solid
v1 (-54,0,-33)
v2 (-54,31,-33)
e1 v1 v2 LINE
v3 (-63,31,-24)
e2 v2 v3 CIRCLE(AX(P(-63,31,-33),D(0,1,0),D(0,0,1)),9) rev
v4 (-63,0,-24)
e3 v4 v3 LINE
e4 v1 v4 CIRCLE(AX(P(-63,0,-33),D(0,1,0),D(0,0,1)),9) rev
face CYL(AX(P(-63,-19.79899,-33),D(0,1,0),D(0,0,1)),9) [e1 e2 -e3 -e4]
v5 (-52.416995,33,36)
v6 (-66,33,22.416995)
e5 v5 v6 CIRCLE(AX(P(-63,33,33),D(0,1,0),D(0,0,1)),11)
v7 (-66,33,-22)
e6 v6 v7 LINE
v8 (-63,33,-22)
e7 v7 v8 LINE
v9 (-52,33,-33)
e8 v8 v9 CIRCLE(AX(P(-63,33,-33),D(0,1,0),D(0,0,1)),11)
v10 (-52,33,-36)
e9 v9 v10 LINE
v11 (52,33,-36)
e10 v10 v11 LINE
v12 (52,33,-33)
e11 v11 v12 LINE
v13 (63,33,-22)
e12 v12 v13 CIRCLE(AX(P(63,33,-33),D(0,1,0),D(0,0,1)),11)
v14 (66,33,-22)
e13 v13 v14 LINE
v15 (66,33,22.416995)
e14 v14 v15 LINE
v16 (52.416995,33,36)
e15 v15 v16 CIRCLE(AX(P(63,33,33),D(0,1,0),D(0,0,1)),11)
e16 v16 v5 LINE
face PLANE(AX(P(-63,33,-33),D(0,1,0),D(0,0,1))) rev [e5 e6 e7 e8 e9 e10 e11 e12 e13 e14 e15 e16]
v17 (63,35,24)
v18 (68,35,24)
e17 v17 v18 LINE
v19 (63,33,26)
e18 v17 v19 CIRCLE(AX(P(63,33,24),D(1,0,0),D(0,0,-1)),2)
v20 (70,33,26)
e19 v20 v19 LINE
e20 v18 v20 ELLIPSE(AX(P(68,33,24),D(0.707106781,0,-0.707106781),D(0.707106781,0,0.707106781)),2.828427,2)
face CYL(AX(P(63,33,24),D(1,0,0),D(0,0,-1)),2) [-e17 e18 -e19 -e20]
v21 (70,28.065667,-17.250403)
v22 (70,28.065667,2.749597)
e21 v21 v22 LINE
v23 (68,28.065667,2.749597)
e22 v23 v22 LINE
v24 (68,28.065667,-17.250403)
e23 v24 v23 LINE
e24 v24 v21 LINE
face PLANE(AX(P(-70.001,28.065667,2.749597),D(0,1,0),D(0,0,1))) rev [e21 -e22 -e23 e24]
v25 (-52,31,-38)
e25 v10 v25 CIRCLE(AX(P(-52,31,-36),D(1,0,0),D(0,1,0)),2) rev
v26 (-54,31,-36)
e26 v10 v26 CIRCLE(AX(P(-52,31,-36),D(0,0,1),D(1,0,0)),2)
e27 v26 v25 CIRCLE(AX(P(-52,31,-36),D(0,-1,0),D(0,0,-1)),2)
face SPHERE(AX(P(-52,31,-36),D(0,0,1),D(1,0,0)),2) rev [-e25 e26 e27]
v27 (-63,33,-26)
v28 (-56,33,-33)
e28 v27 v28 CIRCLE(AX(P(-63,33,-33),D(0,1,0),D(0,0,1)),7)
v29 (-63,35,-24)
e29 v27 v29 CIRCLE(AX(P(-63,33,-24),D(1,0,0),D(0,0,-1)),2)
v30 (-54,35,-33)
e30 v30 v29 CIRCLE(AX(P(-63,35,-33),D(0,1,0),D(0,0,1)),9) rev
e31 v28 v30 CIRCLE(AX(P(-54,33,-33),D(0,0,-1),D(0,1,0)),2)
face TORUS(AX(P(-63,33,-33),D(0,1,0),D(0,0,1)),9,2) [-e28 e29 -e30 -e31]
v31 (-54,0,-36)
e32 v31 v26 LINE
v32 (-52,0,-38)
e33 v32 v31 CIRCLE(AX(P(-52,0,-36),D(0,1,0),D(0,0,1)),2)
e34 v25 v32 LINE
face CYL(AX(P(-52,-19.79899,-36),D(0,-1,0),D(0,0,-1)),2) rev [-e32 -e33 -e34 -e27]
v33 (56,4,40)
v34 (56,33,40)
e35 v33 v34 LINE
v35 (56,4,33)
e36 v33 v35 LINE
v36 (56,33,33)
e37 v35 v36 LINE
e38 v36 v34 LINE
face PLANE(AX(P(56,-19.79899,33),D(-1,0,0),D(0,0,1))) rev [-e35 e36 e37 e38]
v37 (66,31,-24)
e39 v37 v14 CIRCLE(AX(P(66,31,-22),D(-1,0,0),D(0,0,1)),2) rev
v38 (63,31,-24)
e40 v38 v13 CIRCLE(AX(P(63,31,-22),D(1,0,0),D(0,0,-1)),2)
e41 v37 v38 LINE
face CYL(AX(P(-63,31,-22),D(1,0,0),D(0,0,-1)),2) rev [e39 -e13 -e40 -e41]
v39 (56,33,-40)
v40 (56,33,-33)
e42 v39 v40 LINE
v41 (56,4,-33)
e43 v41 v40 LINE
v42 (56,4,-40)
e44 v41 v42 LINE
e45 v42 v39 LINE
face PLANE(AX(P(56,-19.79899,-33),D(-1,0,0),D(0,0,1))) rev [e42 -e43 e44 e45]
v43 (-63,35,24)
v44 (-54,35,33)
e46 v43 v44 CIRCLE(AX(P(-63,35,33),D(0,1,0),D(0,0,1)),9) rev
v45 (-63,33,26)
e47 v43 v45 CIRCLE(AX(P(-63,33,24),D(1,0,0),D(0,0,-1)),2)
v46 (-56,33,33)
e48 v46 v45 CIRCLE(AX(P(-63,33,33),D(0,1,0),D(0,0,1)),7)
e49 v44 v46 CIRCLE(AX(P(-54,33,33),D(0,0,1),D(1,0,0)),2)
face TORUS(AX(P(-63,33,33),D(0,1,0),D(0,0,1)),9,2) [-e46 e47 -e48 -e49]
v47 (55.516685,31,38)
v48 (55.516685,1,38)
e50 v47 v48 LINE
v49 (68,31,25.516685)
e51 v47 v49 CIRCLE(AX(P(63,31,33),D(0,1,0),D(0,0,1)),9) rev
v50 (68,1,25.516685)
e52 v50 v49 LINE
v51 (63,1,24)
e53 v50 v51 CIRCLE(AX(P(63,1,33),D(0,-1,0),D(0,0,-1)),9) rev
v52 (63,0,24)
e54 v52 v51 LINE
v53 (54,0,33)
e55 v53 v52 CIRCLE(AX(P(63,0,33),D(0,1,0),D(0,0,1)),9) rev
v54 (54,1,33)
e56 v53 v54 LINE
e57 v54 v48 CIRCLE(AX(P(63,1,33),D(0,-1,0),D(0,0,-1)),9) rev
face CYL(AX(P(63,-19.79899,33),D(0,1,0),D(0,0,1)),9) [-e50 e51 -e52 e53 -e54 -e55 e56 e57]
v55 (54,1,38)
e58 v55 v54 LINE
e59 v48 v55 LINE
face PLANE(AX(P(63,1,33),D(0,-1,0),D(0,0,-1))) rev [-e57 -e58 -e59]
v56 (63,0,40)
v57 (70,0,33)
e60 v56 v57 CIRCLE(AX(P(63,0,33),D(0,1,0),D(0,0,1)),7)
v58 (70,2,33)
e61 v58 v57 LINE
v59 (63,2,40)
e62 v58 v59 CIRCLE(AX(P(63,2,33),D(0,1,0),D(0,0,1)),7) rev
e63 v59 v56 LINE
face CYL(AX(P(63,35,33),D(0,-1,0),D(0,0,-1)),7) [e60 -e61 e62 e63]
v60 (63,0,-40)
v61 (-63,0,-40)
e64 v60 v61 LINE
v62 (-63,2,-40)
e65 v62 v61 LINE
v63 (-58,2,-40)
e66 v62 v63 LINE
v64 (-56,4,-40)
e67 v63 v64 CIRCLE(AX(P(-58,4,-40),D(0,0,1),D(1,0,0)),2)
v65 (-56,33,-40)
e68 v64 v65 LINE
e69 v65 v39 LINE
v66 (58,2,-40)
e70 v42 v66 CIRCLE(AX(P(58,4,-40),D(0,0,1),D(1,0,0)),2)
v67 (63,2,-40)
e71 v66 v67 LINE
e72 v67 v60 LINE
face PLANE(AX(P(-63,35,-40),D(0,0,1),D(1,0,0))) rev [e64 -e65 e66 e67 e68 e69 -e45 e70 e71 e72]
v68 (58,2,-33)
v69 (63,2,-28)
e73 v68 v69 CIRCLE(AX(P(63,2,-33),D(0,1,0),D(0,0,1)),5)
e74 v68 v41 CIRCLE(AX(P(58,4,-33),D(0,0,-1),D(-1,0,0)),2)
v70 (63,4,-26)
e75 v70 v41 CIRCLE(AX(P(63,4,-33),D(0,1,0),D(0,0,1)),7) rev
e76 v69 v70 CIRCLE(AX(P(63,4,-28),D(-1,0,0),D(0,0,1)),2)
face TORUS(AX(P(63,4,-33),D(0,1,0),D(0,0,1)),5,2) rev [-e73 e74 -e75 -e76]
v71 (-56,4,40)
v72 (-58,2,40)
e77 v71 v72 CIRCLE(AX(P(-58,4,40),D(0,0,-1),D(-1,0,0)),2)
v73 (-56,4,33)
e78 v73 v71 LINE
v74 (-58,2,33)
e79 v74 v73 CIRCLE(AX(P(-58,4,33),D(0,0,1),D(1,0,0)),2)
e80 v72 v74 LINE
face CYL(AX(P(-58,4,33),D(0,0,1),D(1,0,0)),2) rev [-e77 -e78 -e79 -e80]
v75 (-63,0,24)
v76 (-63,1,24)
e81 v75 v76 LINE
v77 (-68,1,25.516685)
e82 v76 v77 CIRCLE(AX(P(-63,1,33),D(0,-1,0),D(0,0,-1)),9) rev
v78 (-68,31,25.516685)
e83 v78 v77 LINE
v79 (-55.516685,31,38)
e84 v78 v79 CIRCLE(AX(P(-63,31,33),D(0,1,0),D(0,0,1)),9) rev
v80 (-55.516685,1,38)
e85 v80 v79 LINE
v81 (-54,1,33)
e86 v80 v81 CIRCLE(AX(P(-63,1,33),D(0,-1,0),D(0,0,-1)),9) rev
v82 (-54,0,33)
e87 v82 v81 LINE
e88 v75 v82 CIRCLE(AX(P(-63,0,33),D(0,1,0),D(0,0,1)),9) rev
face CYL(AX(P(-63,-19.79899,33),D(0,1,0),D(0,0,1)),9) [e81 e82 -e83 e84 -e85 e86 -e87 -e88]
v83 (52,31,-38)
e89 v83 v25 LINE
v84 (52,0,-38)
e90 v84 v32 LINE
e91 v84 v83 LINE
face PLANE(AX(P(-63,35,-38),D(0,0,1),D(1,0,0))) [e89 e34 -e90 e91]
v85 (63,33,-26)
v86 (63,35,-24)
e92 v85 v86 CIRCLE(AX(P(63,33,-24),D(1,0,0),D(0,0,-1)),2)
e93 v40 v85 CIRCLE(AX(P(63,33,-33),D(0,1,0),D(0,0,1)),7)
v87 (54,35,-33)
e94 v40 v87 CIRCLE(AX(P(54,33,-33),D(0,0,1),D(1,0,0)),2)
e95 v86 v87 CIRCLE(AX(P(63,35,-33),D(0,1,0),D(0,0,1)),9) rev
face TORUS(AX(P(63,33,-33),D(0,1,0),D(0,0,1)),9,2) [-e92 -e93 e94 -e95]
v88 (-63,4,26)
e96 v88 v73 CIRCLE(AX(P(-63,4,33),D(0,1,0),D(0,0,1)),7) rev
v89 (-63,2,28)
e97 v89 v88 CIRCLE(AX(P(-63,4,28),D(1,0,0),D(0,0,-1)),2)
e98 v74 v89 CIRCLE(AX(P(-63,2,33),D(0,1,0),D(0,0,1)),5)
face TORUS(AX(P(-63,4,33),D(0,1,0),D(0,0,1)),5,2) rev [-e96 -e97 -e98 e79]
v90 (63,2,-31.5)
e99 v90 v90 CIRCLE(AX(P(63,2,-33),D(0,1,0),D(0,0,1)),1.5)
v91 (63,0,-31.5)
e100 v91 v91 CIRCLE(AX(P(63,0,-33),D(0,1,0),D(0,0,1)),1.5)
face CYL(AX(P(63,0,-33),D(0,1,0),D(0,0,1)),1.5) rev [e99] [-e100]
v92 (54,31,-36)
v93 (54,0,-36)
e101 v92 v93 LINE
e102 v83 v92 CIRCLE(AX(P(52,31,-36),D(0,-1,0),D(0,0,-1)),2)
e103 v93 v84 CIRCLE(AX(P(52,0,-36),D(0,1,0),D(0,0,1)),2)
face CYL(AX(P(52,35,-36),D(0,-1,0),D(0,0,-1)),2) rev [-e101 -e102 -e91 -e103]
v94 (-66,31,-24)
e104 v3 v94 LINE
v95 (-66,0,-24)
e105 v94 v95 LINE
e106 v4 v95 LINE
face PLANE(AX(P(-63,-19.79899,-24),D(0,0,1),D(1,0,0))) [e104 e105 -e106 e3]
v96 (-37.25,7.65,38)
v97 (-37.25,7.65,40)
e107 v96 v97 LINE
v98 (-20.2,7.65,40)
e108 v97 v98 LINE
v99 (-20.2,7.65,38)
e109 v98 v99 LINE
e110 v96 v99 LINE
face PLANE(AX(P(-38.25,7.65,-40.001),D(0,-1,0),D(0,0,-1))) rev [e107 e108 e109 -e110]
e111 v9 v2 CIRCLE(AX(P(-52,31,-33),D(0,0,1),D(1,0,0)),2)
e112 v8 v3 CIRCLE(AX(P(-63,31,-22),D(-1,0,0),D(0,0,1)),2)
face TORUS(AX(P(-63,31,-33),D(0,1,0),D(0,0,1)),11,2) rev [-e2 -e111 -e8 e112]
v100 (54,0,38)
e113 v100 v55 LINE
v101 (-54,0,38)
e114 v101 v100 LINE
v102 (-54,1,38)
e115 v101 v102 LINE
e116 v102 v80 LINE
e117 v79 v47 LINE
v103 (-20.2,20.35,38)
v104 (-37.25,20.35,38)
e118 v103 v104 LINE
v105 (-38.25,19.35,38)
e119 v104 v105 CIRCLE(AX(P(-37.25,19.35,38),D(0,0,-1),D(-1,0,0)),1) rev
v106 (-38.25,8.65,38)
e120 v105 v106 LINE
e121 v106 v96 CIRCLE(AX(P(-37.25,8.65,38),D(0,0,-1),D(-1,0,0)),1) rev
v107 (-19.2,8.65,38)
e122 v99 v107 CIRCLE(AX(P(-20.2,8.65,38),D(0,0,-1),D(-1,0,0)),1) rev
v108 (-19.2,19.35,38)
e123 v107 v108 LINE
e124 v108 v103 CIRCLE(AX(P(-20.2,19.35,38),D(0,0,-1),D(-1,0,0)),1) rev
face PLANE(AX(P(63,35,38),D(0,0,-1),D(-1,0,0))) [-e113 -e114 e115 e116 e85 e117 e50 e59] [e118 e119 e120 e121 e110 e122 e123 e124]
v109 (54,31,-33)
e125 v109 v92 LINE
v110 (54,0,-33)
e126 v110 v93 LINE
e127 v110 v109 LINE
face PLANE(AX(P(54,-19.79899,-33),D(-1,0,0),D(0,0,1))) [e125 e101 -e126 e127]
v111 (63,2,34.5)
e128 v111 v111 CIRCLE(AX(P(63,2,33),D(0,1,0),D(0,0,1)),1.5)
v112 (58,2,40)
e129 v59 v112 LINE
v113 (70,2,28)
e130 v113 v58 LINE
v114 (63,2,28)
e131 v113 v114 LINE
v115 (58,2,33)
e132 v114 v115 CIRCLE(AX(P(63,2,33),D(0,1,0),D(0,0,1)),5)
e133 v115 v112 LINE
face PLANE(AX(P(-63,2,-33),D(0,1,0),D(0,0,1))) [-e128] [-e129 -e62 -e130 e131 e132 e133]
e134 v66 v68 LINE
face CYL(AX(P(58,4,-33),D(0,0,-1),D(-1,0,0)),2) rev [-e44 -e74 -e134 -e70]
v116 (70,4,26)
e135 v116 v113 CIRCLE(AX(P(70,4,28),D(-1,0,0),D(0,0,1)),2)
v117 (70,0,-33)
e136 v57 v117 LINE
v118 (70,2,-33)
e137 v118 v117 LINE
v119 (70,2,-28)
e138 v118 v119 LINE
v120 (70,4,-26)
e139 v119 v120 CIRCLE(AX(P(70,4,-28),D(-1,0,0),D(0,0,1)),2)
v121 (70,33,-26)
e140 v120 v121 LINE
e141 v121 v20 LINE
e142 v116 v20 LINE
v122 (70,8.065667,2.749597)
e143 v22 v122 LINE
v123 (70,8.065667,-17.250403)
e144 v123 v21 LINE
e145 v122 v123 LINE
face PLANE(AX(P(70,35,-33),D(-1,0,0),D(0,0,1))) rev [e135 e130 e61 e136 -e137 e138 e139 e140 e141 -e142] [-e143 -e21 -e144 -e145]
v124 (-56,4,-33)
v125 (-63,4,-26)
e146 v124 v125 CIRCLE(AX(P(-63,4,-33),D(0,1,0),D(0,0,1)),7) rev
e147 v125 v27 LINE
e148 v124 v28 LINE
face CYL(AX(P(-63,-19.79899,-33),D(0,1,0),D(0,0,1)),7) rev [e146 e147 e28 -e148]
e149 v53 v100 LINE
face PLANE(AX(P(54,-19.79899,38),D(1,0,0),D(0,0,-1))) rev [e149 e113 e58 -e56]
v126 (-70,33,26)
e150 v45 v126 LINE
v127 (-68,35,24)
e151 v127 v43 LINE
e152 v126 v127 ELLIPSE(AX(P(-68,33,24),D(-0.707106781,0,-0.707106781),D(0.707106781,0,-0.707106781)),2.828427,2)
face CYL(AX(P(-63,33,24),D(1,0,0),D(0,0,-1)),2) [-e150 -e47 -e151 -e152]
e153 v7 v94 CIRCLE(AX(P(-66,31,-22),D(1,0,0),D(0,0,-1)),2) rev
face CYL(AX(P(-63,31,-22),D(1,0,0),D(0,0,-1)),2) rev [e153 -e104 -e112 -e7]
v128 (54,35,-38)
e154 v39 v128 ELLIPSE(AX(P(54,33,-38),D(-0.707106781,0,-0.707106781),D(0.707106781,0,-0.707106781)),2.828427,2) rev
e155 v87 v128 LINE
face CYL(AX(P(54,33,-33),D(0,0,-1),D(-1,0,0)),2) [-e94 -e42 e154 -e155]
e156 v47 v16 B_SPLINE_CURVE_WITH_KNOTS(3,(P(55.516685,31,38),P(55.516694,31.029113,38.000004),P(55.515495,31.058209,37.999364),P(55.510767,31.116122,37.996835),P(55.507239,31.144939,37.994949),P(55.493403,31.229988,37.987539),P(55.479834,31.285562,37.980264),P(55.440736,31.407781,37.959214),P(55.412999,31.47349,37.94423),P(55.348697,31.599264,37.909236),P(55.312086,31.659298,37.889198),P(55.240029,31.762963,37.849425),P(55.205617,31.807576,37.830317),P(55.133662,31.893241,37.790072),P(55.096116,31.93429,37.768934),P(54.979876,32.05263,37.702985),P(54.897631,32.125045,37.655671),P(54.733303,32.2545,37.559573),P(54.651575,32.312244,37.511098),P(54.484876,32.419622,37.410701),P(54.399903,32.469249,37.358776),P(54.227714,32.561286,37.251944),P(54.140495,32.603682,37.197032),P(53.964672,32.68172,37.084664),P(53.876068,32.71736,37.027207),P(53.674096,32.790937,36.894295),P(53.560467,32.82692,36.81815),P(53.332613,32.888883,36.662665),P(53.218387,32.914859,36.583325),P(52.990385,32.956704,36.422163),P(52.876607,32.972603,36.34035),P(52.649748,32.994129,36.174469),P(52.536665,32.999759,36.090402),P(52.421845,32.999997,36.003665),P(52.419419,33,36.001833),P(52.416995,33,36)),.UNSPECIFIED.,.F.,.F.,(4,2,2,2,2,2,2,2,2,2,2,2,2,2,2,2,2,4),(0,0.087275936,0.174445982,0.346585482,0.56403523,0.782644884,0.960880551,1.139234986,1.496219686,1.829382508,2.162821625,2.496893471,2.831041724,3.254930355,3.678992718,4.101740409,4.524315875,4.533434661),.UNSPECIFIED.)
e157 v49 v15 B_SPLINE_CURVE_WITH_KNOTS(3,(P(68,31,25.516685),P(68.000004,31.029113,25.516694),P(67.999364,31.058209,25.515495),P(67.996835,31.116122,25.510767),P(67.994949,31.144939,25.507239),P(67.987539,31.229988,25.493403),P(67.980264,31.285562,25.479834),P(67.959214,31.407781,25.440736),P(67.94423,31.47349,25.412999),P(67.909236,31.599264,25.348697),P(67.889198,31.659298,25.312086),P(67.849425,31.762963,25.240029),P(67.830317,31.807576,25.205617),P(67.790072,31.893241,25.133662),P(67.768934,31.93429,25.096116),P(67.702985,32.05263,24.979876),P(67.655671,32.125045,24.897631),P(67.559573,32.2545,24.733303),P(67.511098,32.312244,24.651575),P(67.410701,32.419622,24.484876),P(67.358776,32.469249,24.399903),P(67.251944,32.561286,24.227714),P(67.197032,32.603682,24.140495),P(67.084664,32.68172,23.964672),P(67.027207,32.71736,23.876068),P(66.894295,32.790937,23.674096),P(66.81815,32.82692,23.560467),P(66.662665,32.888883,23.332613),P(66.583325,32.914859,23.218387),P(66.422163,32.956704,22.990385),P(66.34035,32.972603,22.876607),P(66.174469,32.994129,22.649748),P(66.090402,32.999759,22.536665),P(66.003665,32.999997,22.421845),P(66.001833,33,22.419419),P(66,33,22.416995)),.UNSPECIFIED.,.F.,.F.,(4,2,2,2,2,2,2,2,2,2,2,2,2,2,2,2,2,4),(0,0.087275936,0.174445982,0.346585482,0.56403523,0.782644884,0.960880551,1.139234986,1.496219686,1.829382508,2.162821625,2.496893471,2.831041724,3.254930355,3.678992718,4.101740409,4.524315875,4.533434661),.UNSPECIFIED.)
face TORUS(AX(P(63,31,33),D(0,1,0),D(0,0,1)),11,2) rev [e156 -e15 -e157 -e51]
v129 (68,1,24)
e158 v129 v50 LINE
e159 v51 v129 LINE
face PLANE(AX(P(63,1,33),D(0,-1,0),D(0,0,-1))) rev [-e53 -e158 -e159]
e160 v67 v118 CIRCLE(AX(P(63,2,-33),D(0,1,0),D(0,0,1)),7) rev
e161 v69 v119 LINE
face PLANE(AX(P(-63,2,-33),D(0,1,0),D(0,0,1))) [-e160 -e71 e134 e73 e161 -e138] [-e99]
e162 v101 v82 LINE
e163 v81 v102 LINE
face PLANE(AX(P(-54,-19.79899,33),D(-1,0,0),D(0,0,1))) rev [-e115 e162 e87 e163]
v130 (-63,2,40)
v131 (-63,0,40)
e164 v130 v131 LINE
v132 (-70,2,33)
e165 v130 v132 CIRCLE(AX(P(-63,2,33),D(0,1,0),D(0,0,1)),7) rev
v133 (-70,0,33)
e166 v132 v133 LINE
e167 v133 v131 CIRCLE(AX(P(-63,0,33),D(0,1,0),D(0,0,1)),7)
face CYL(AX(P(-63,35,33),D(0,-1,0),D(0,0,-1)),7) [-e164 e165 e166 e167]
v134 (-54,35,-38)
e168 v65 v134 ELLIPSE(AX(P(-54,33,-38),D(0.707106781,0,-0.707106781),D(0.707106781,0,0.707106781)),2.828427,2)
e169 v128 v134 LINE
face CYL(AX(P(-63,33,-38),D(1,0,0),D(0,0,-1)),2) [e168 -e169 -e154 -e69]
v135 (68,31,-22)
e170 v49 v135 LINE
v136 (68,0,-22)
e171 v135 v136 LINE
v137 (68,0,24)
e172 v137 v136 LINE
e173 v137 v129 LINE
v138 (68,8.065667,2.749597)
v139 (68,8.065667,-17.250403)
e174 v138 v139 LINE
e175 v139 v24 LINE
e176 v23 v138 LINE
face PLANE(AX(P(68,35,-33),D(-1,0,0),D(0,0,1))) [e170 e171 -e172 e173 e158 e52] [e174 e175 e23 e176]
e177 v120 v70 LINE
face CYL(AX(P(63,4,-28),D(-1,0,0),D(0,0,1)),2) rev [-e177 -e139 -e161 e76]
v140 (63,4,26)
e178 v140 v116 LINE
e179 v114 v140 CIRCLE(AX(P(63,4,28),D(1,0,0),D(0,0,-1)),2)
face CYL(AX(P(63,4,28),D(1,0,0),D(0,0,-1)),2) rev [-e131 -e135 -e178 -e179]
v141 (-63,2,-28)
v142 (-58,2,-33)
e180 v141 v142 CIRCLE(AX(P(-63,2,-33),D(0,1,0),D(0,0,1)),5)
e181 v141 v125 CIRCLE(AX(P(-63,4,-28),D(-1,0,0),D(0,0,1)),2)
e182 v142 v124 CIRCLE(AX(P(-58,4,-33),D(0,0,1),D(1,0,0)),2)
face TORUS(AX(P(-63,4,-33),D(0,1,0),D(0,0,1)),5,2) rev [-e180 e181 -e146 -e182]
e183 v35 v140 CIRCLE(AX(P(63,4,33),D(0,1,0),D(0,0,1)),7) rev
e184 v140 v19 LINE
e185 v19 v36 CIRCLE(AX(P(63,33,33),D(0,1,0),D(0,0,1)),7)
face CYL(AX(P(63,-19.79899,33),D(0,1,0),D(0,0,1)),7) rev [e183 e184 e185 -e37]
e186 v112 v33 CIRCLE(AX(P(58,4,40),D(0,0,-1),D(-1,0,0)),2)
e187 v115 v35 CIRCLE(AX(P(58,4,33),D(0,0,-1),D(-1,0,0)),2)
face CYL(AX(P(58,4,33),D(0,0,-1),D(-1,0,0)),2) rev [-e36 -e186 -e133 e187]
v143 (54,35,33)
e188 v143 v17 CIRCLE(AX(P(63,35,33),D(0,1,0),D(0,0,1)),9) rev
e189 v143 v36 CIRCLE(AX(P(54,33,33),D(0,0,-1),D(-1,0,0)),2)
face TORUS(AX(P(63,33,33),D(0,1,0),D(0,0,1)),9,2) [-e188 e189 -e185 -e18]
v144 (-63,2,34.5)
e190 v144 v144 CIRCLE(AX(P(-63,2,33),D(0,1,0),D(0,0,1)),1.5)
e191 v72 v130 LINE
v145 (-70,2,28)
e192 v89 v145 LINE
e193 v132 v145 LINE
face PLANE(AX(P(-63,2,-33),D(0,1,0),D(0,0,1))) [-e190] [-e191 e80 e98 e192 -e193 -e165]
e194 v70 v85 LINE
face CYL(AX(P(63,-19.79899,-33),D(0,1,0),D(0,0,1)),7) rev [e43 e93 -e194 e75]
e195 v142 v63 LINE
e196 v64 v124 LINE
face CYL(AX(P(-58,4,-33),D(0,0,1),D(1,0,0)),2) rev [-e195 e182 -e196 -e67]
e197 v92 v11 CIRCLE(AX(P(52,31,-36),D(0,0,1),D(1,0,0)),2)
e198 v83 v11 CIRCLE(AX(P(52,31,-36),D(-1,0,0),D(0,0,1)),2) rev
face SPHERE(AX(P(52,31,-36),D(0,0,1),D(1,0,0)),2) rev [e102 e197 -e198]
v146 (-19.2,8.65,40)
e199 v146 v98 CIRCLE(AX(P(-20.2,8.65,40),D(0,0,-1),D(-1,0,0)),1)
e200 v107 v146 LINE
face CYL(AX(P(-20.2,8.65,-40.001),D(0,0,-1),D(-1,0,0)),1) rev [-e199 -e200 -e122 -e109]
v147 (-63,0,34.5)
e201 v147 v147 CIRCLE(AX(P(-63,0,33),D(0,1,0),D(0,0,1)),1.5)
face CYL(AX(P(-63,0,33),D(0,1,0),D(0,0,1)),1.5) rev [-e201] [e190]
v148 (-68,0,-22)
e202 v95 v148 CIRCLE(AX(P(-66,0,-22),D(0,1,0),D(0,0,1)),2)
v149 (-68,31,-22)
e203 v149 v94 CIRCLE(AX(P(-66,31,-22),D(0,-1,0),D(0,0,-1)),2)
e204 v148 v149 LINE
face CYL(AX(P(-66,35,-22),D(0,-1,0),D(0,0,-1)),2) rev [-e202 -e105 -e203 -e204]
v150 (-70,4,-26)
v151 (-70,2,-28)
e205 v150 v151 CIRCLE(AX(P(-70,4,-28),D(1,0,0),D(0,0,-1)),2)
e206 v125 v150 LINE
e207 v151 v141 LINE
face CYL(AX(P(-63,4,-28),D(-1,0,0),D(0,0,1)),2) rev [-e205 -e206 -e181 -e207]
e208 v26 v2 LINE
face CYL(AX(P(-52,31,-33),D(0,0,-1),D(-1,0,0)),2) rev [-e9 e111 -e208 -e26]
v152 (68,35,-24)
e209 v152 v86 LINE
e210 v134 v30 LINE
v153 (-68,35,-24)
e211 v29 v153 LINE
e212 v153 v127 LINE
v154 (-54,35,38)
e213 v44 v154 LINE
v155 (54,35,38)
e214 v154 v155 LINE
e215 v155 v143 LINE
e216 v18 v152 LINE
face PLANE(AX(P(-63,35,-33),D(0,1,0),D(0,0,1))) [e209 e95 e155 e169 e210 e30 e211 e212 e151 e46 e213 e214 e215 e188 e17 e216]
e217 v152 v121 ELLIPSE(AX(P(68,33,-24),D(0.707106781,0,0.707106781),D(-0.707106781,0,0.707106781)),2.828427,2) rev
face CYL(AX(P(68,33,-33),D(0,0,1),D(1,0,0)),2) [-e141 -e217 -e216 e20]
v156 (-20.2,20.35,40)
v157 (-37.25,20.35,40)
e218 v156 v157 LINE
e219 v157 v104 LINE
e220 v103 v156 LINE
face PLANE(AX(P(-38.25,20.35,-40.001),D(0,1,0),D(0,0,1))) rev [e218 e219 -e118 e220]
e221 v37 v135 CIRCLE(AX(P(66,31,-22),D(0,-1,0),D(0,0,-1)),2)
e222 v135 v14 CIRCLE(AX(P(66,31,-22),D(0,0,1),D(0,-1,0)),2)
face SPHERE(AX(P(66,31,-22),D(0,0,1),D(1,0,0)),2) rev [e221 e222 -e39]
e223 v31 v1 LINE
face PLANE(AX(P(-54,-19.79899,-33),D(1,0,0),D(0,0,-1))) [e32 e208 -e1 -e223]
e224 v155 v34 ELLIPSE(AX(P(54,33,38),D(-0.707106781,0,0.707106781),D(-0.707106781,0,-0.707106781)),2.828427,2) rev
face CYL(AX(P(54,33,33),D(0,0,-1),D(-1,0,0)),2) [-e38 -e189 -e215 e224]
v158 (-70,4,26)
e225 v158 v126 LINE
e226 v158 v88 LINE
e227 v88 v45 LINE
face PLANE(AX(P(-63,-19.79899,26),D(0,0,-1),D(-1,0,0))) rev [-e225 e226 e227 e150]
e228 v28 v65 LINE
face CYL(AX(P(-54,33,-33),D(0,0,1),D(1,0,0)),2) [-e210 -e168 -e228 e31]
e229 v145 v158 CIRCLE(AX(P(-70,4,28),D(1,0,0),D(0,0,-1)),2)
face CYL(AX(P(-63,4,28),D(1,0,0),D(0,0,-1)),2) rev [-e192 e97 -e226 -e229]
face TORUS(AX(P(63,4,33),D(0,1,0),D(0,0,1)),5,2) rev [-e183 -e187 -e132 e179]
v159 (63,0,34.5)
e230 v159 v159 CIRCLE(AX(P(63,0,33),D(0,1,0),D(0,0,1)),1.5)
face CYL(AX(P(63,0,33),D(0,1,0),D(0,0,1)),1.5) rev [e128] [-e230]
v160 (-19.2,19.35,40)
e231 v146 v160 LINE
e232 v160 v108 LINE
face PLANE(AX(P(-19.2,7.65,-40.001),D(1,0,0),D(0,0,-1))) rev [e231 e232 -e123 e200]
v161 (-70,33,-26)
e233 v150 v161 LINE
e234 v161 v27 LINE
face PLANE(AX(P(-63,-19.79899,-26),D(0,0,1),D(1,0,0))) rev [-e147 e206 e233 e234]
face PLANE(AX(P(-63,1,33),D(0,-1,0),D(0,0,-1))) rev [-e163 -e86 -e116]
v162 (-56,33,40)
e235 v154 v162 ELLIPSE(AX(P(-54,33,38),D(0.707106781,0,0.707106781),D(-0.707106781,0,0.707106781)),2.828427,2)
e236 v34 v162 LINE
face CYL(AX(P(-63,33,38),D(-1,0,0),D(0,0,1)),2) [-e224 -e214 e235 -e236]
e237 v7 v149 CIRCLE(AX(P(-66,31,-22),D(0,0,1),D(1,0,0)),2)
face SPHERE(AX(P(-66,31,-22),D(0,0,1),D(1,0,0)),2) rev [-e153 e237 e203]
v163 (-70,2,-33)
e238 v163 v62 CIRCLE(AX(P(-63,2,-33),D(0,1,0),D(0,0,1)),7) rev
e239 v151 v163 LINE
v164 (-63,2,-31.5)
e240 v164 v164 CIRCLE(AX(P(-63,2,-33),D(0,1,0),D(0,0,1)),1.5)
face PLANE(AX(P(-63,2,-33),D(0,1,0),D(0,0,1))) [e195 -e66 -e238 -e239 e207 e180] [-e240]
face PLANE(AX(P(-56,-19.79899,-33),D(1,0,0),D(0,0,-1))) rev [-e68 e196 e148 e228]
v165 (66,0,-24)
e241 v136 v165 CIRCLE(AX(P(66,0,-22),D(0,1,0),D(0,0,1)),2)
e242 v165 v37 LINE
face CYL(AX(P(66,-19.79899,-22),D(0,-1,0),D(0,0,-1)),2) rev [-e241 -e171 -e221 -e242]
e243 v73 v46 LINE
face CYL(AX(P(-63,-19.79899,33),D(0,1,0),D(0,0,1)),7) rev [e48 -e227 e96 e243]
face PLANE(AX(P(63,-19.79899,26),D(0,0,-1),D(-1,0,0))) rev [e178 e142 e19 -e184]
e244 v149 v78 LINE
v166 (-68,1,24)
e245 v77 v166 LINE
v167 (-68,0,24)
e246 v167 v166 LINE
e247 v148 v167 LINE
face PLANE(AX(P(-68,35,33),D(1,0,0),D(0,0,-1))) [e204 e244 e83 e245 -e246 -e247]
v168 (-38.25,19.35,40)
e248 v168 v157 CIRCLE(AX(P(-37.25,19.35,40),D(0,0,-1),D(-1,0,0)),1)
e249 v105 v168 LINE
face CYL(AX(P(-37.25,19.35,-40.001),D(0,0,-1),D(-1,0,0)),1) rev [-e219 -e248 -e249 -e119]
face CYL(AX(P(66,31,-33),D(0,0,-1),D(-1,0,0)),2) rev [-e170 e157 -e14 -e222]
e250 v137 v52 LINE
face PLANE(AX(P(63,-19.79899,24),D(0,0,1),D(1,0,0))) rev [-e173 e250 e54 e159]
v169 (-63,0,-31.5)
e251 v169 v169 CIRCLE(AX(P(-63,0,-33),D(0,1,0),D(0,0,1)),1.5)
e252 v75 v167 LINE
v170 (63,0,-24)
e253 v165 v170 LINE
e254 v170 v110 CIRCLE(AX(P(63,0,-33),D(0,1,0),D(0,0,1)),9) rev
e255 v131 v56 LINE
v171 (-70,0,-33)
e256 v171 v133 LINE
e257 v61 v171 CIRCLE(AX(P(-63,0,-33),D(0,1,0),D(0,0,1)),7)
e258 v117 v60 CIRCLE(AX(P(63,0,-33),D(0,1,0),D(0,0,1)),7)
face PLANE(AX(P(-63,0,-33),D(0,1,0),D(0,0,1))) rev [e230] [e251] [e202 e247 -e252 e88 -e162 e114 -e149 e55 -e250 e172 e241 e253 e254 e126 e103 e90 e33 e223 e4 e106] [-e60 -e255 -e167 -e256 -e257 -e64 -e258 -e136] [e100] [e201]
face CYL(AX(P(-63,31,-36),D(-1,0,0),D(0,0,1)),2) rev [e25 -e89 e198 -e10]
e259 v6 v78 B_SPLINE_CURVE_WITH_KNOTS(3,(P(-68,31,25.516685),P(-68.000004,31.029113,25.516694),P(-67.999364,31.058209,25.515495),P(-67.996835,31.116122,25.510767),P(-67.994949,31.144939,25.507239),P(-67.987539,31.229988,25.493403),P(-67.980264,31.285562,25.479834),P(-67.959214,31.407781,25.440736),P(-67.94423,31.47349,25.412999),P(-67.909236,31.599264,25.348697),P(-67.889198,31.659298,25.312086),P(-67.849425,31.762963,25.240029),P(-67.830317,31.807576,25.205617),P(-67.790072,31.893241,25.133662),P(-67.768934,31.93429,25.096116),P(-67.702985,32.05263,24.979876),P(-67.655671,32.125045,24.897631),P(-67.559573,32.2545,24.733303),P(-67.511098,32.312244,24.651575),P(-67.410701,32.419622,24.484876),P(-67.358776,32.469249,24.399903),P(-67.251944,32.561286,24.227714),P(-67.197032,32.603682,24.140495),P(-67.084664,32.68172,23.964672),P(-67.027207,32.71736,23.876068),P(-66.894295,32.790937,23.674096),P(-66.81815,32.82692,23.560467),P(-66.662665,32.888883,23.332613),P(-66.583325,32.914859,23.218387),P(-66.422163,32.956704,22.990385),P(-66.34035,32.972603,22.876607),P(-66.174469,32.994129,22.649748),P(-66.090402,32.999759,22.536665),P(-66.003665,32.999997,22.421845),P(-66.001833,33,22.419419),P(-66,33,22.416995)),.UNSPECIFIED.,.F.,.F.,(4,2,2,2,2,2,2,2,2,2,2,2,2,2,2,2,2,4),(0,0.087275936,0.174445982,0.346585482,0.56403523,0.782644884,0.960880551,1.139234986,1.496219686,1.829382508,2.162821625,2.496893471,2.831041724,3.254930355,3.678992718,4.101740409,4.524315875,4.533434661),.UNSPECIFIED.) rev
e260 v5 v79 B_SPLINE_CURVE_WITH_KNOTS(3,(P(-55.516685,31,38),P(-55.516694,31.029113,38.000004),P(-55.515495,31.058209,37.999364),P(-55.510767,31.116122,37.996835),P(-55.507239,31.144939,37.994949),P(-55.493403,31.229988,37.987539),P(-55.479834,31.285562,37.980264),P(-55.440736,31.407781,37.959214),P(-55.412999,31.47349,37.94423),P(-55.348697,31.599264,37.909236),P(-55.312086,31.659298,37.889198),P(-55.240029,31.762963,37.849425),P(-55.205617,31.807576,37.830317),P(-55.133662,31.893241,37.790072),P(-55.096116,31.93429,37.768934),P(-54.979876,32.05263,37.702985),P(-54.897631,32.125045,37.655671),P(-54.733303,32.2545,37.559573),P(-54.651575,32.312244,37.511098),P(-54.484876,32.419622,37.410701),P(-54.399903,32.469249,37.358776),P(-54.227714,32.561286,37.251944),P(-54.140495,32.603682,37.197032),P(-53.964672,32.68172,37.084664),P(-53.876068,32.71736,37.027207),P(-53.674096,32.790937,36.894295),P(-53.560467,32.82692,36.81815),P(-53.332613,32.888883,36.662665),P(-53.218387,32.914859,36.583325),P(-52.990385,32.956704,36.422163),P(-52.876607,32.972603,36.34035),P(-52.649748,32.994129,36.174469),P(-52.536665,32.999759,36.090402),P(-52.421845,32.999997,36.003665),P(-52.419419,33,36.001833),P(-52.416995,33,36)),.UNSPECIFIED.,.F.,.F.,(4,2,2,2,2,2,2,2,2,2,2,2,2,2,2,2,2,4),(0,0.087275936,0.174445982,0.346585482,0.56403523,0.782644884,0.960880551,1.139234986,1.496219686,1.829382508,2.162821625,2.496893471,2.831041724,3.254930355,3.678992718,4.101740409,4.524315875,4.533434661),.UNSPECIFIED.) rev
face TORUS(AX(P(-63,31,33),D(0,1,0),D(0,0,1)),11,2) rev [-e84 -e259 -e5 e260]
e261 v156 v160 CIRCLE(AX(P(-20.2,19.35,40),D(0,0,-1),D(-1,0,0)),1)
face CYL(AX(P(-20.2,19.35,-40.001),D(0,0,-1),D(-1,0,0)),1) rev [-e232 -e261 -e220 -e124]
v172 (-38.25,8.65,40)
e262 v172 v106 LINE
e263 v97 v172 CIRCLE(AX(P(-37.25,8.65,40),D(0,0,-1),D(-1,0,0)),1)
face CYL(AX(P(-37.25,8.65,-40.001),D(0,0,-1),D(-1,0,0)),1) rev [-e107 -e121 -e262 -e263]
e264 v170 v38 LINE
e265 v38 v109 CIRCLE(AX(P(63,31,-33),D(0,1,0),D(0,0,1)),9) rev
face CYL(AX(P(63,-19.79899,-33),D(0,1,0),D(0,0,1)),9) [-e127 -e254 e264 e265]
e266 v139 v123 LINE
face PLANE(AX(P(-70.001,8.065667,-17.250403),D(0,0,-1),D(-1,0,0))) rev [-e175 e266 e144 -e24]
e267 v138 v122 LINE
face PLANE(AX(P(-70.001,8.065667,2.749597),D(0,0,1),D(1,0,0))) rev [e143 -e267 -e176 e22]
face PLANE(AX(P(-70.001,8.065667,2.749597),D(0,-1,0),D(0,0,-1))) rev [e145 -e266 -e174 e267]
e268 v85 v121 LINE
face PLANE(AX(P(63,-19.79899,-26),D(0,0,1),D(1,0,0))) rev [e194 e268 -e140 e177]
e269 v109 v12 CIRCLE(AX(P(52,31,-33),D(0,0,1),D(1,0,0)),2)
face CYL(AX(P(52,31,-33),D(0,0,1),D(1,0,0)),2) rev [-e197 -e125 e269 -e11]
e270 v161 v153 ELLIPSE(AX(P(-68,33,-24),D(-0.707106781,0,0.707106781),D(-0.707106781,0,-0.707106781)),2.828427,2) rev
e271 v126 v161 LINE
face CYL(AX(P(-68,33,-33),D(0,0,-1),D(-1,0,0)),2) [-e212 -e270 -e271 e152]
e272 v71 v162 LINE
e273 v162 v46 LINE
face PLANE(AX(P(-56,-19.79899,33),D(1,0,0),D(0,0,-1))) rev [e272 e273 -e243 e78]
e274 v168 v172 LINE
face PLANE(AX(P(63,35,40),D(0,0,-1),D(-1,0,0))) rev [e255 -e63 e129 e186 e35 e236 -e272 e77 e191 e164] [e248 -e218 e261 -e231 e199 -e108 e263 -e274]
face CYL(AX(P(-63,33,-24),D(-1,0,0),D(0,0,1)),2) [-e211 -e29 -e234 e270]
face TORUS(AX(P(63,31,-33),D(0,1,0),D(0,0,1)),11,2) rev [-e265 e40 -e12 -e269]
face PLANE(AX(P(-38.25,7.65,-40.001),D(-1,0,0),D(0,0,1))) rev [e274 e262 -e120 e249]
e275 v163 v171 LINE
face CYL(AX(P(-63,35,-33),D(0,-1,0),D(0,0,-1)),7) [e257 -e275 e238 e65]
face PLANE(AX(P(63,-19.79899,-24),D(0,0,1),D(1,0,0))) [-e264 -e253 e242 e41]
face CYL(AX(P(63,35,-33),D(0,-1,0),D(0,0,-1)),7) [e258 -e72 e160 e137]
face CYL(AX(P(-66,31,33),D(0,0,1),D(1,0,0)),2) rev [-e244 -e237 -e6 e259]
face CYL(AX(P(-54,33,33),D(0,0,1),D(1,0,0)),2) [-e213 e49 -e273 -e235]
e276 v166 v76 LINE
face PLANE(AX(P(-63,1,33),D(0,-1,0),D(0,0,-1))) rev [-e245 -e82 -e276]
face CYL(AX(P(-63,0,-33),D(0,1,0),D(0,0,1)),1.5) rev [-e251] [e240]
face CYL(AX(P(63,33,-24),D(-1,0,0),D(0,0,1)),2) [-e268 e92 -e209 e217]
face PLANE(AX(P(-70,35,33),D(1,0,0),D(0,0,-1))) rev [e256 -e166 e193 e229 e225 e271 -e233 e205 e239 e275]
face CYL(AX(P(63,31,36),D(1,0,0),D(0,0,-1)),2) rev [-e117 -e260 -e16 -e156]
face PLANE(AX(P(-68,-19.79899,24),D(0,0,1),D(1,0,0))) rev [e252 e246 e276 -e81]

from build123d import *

# Parameters (mm, degrees)
BOSS_EXTRUDE3_DEPTH     = 35
CUT_EXTRUDE4_START      = -33
CUT_EXTRUDE4_DEPTH      = 33
SHELL3_DEPTH            = 33
BOSS_EXTRUDE5_START     = 1
BOSS_EXTRUDE5_DEPTH     = 1
CUT_EXTRUDE5_DEPTH      = 88.114866699
CUT_EXTRUDE5_DEPTH_BACK = 88.114866699
SKETCH10_R              = 1.5
FILLET6_R               = 2
FILLET8_R               = 2
CUT_EXTRUDE7_REACH      = 151.75
SKETCH13_W              = 20
SKETCH13_H              = 20
CUT_EXTRUDE10_REACH     = 113.915
SKETCH16_W              = 19.05
SKETCH16_H              = 12.7
FILLET11_R              = 1


# Read off the part's stored shape, not the designer's step: Shell3
with BuildPart() as part:
    # Sketch4 → Boss-Extrude3 (new body)
    with BuildSketch(Plane(origin=(0, 0, 0), x_dir=(1, 0, 0), z_dir=(0, 1, 0))):
        with BuildLine():
            Line((-63, 40), (63, 40))
            ThreePointArc((63, 40), (67.949747468, 37.949747468), (70, 33))
            Line((70, 33), (70, -33))
            ThreePointArc((70, -33), (67.949747468, -37.949747468), (63, -40))
            Line((63, -40), (-63, -40))
            ThreePointArc((-63, -40), (-67.949747468, -37.949747468), (-70, -33))
            Line((-70, -33), (-70, 33))
            ThreePointArc((-70, 33), (-67.949747468, 37.949747468), (-63, 40))
        make_face()
    extrude(amount=BOSS_EXTRUDE3_DEPTH)

    # Sketch9 → Cut-Extrude4 (cut)
    with BuildSketch(Plane(origin=(0, 35, 0), x_dir=(1, 0, 0), z_dir=(0, 1, 0)).offset(CUT_EXTRUDE4_START)):
        with BuildLine():
            Line((-63, 26), (-70, 26))
            Line((-70, 26), (-70, 33))
            ThreePointArc((-70, 33), (-67.949747468, 37.949747468), (-63, 40))
            Line((-63, 40), (-56, 40))
            Line((-56, 40), (-56, 33))
            ThreePointArc((-56, 33), (-58.050252532, 28.050252532), (-63, 26))
        make_face()
        with BuildLine():
            Line((-63, -26), (-70, -26))
            Line((-70, -26), (-70, -33))
            ThreePointArc((-70, -33), (-67.949747468, -37.949747468), (-63, -40))
            Line((-63, -40), (-56, -40))
            Line((-56, -40), (-56, -33))
            ThreePointArc((-56, -33), (-58.050252532, -28.050252532), (-63, -26))
        make_face()
        with BuildLine():
            Line((56, -33), (56, -40))
            Line((56, -40), (63, -40))
            ThreePointArc((63, -40), (67.949747468, -37.949747468), (70, -33))
            Line((70, -33), (70, -26))
            Line((70, -26), (63, -26))
            ThreePointArc((63, -26), (58.050252532, -28.050252532), (56, -33))
        make_face()
        with BuildLine():
            Line((56, 33), (56, 40))
            Line((56, 40), (63, 40))
            ThreePointArc((63, 40), (67.949747468, 37.949747468), (70, 33))
            Line((70, 33), (70, 26))
            Line((70, 26), (63, 26))
            ThreePointArc((63, 26), (58.050252532, 28.050252532), (56, 33))
        make_face()
    extrude(amount=CUT_EXTRUDE4_DEPTH, mode=Mode.SUBTRACT)

    # Shell3 outline → Shell3 (cut)
    with BuildSketch(Plane(origin=(0, 0, 0), x_dir=(1, 0, 0), z_dir=(0, 1, 0))):
        with BuildLine():
            Line((-68, 24), (-68, -25.516685226))
            ThreePointArc((-68, -25.516685226), (-56.636038969, -26.636038969), (-55.516685226, -38))
            Line((-55.516685226, -38), (55.516685226, -38))
            ThreePointArc((55.516685226, -38), (56.636038969, -26.636038969), (68, -25.516685226))
            Line((68, -25.516685226), (68, 24))
            Line((68, 24), (63, 24))
            ThreePointArc((63, 24), (56.636038969, 26.636038969), (54, 33))
            Line((54, 33), (54, 38))
            Line((54, 38), (-54, 38))
            Line((-54, 38), (-54, 33))
            ThreePointArc((-54, 33), (-56.636038969, 26.636038969), (-63, 24))
            Line((-63, 24), (-68, 24))
        make_face()
    extrude(amount=SHELL3_DEPTH, mode=Mode.SUBTRACT)

    # Sketch11 → Boss-Extrude5 (add)
    with BuildSketch(Plane.XZ.offset(-1).offset(BOSS_EXTRUDE5_START)):
        with BuildLine():
            Line((68, 24), (63, 24))
            ThreePointArc((63, 24), (56.636038969, 26.636038969), (54, 33))
            Line((54, 33), (54, 38))
            Line((54, 38), (63, 38))
            ThreePointArc((63, 38), (66.535533906, 36.535533906), (68, 33))
            Line((68, 33), (68, 24))
        make_face()
        with BuildLine():
            Line((54, -33), (54, -38))
            Line((54, -38), (63, -38))
            ThreePointArc((63, -38), (66.535533906, -36.535533906), (68, -33))
            Line((68, -33), (68, -24))
            Line((68, -24), (63, -24))
            ThreePointArc((63, -24), (56.636038969, -26.636038969), (54, -33))
        make_face()
        with BuildLine():
            Line((-63, -24), (-68, -24))
            Line((-68, -24), (-68, -33))
            ThreePointArc((-68, -33), (-66.535533906, -36.535533906), (-63, -38))
            Line((-63, -38), (-54, -38))
            Line((-54, -38), (-54, -33))
            ThreePointArc((-54, -33), (-56.636038969, -26.636038969), (-63, -24))
        make_face()
        with BuildLine():
            Line((-54, 33), (-54, 38))
            Line((-54, 38), (-63, 38))
            ThreePointArc((-63, 38), (-66.535533906, 36.535533906), (-68, 33))
            Line((-68, 33), (-68, 24))
            Line((-68, 24), (-63, 24))
            ThreePointArc((-63, 24), (-56.636038969, 26.636038969), (-54, 33))
        make_face()
    extrude(amount=-BOSS_EXTRUDE5_DEPTH)

    # Sketch10 → Cut-Extrude5 (cut, two sides: drawn at the far end of the back side and taken through both)
    with BuildSketch(Plane(origin=(0, 2, 0), x_dir=(1, 0, 0), z_dir=(0, 1, 0)).offset(-CUT_EXTRUDE5_DEPTH_BACK)):
        with Locations(Location((-63, 33, 0), (0, 0, 270))):
            Circle(SKETCH10_R)
        with Locations(Location((63, 33, 0), (0, 0, 270))):
            Circle(SKETCH10_R)
        with Locations(Location((63, -33, 0), (0, 0, 270))):
            Circle(SKETCH10_R)
        with Locations(Location((-63, -33, 0), (0, 0, 270))):
            Circle(SKETCH10_R)
    extrude(amount=CUT_EXTRUDE5_DEPTH + CUT_EXTRUDE5_DEPTH_BACK, mode=Mode.SUBTRACT)

    # Fillet6
    fillet6_edges = [part.edges().sort_by_distance(p)[0] for p in [
        (68, 16.5, -24),
        (-54, 16.5, -38),
        (0, 33, -38),
        (-68, 33, 0.758342613),
        (0, 33, 38),
        (68, 33, 0.758342613),
        (-56.636038969, 33, 26.636038969),
        (-56.636038969, 33, -26.636038969),
        (-68, 16.5, -24),
        (-65.5, 33, -24),
        (-54, 33, -35.5),
        (56.636038969, 33, 26.636038969),
        (56.636038969, 33, -26.636038969),
        (54, 16.5, -38),
        (54, 33, -35.5),
        (65.5, 33, -24),
    ]]
    fillet(fillet6_edges, radius=FILLET6_R)

    # Fillet8
    fillet8_edges = [part.edges().sort_by_distance(p)[0] for p in [
        (0, 35, 40),
        (-58.050252532, 35, 28.050252532),
        (-66.5, 35, 26),
        (-56, 35, 36.5),
        (-58.050252532, 2, 28.050252532),
        (-56, 2, 36.5),
        (-66.5, 2, 26),
        (-70, 35, 0),
        (-58.050252532, 35, -28.050252532),
        (-56, 35, -36.5),
        (-66.5, 35, -26),
        (-58.050252532, 2, -28.050252532),
        (-66.5, 2, -26),
        (-56, 2, -36.5),
        (70, 35, 0),
        (58.050252532, 35, 28.050252532),
        (56, 35, 36.5),
        (66.5, 35, 26),
        (58.050252532, 2, 28.050252532),
        (66.5, 2, 26),
        (56, 2, 36.5),
        (0, 35, -40),
        (58.050252532, 35, -28.050252532),
        (66.5, 35, -26),
        (56, 35, -36.5),
        (58.050252532, 2, -28.050252532),
        (56, 2, -36.5),
        (66.5, 2, -26),
    ]]
    fillet(fillet8_edges, radius=FILLET8_R)

    # Sketch13 → Cut-Extrude7 (cut, up to next)
    with BuildSketch(Plane(origin=(70, 0, 0), x_dir=(0, 0, -1), z_dir=(1, 0, 0)), mode=Mode.PRIVATE) as cut_extrude7_sk1:
        with Locations((7.25040296, 18.065666935)):
            Rectangle(SKETCH13_W, SKETCH13_H)
    cut_extrude7_tool1 = extrude(cut_extrude7_sk1.sketch, amount=-CUT_EXTRUDE7_REACH, mode=Mode.PRIVATE) & part.part
    add(cut_extrude7_tool1.solids().sort_by_distance((70, 18.065667, -7.250403))[0], mode=Mode.SUBTRACT)

    # Sketch16 → Cut-Extrude10 (cut, up to next)
    with BuildSketch(Plane.XY.offset(40), mode=Mode.PRIVATE) as cut_extrude10_sk1:
        with Locations((-28.725, 14)):
            Rectangle(SKETCH16_W, SKETCH16_H)
    cut_extrude10_tool1 = extrude(cut_extrude10_sk1.sketch, amount=-CUT_EXTRUDE10_REACH, mode=Mode.PRIVATE) & part.part
    add(cut_extrude10_tool1.solids().sort_by_distance((-28.725, 14, 40))[0], mode=Mode.SUBTRACT)

    # Fillet11
    fillet11_edges = [part.edges().sort_by_distance(p)[0] for p in [
        (-19.2, 20.35, 39),
        (-19.2, 7.65, 39),
        (-38.25, 7.65, 39),
        (-38.25, 20.35, 39),
    ]]
    fillet(fillet11_edges, radius=FILLET11_R)


solid = part.part
